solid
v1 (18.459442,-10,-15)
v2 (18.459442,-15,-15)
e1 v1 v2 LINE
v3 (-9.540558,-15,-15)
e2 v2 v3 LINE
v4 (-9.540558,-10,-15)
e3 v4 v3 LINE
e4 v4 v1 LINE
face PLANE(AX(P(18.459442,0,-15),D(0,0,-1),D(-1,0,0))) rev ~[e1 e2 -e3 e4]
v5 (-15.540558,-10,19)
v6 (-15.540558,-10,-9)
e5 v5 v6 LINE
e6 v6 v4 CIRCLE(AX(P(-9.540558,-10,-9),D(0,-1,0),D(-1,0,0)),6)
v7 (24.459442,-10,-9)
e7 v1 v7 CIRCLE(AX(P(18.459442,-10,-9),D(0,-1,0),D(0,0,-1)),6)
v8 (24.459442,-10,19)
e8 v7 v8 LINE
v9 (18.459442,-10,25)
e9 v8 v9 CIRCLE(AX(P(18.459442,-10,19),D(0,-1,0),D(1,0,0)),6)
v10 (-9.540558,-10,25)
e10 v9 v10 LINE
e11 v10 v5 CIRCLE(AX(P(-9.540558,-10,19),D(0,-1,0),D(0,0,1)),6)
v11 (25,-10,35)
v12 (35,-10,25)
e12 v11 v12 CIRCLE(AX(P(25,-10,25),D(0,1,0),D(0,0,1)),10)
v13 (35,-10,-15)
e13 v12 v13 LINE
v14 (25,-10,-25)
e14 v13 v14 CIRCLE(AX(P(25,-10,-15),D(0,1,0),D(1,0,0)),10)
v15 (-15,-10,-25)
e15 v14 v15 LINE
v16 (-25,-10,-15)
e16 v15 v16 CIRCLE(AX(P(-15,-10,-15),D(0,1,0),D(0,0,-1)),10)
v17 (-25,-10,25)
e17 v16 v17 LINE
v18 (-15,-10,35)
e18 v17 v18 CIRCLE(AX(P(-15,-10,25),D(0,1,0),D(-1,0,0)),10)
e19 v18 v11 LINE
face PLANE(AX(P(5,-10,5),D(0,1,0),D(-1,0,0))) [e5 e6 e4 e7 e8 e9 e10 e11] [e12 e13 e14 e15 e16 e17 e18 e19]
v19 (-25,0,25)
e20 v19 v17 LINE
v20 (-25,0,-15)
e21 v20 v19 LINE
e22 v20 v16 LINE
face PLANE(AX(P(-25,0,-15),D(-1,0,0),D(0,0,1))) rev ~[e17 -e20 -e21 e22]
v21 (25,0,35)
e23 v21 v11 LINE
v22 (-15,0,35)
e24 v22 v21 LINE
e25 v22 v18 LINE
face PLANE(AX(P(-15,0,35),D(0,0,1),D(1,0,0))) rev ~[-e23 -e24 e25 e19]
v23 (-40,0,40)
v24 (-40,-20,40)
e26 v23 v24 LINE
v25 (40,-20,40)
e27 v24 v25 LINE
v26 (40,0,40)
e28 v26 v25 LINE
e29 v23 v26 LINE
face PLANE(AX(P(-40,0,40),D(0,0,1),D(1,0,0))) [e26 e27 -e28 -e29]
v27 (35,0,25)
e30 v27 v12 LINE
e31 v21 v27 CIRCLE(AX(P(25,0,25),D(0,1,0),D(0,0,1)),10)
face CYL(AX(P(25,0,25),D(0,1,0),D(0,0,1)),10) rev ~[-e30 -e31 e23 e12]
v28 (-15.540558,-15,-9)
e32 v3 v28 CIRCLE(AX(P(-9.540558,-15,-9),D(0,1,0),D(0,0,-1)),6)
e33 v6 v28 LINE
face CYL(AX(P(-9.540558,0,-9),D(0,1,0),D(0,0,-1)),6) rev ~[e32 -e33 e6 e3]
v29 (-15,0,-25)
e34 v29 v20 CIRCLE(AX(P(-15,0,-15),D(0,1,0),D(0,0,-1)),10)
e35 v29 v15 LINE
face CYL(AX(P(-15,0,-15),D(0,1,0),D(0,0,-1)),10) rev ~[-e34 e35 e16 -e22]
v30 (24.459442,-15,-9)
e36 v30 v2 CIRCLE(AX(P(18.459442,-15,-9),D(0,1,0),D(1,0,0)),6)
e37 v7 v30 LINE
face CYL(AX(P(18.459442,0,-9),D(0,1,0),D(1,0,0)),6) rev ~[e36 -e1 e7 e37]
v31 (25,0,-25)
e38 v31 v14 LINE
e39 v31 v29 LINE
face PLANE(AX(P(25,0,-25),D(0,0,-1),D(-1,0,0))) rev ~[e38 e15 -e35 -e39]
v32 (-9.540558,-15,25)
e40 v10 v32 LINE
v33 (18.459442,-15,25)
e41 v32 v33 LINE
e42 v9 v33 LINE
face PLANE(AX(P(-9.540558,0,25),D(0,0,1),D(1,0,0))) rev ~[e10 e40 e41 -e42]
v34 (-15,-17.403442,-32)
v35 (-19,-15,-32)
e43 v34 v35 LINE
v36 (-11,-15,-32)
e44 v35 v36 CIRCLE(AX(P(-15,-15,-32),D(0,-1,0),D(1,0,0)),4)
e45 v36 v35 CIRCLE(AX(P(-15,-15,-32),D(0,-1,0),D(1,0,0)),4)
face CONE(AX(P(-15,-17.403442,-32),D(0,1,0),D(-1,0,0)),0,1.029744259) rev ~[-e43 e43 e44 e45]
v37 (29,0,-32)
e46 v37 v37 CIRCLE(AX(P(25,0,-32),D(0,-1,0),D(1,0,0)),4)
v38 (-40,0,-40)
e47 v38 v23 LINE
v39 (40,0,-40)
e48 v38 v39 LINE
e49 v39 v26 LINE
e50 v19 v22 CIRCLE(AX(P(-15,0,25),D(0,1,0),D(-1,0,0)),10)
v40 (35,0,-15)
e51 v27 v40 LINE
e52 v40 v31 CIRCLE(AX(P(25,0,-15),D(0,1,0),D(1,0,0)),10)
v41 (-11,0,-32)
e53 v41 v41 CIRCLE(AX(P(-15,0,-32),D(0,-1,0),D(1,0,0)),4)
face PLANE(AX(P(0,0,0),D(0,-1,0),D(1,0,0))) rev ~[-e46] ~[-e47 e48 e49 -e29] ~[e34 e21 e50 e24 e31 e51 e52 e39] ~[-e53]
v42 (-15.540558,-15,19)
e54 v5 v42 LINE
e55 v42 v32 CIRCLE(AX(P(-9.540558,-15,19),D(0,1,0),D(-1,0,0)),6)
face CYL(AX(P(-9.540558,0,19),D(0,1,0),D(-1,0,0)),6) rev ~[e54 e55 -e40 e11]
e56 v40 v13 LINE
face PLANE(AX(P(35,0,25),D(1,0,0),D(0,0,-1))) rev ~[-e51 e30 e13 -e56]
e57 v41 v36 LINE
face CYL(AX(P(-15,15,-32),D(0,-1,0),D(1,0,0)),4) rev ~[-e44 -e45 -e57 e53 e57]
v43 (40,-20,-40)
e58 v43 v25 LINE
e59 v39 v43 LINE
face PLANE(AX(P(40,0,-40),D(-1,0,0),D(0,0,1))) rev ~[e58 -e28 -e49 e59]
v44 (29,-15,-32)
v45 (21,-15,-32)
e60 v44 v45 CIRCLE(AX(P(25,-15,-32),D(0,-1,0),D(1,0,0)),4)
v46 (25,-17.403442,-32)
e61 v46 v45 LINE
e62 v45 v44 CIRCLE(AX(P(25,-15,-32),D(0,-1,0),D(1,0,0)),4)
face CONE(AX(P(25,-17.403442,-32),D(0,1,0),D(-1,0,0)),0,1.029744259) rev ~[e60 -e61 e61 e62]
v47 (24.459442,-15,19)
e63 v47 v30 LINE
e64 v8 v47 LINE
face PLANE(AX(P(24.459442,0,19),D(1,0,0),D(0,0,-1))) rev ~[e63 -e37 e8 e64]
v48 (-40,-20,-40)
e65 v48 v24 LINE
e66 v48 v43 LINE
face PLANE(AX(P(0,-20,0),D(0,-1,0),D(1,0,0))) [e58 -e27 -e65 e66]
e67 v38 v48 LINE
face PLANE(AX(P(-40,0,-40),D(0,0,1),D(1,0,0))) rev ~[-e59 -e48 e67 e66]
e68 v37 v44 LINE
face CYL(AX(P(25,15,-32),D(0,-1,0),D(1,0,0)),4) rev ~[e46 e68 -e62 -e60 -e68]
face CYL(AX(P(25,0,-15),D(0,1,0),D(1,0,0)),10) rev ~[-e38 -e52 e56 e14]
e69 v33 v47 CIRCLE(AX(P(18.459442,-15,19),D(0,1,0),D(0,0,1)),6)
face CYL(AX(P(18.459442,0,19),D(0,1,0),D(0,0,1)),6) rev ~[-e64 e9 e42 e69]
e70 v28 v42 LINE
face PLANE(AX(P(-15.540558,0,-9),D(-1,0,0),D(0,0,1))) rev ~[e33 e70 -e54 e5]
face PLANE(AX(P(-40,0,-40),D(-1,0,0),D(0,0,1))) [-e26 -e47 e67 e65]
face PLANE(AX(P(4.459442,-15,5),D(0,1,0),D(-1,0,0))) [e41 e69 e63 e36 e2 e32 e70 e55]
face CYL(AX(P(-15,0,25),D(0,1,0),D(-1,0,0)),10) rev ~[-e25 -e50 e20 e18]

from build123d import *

# Parameters (mm, degrees)
F0_W     = 80
F0_H     = 80
F1_DEPTH = 20
F3_D     = 8
F3_DEPTH = 15
F3_TIP   = 2.4034424761
F4_DEPTH = 10
F5_DEPTH = 15


with BuildPart() as f1:
    # F0 (on Front) → F1 (new body)
    with BuildSketch(Plane.XZ):
        Rectangle(F0_W, F0_H)
    extrude(amount=F1_DEPTH)

    # F3
    with Locations(Plane(origin=(0, 0, 0), x_dir=(-1, 0, 0), z_dir=(0, 1, 0))):
        with Locations((-25, -32), (15, -32)):
            Hole(F3_D / 2, depth=F3_DEPTH)
            with Locations((0, 0, -(F3_DEPTH + F3_TIP / 2))):  # 118° drill point
                Cone(0, F3_D / 2, F3_TIP, mode=Mode.SUBTRACT)

    # F2 (on face) → F4 (cut)
    with BuildSketch(Plane(origin=(0, 0, 0), x_dir=(-1, 0, 0), z_dir=(0, 1, 0))):
        with BuildLine():
            ThreePointArc((-35, -15), (-32.0710678119, -22.0710678119), (-25, -25))
            Line((-25, -25), (15, -25))
            ThreePointArc((15, -25), (22.0710678119, -22.0710678119), (25, -15))
            Line((25, -15), (25, 25))
            ThreePointArc((25, 25), (22.0710678119, 32.0710678119), (15, 35))
            Line((15, 35), (-25, 35))
            ThreePointArc((-25, 35), (-32.0710678119, 32.0710678119), (-35, 25))
            Line((-35, 25), (-35, -15))
        make_face()
        with BuildLine():
            ThreePointArc((-24.4594421512, 19), (-22.7020828383, 23.2426406871), (-18.4594421512, 25))
            Line((-18.4594421512, 25), (9.5405578488, 25))
            ThreePointArc((9.5405578488, 25), (13.7831985359, 23.2426406871), (15.5405578488, 19))
            Line((15.5405578488, 19), (15.5405578488, -9))
            ThreePointArc((15.5405578488, -9), (13.7831985359, -13.2426406871), (9.5405578488, -15))
            Line((9.5405578488, -15), (-18.4594421512, -15))
            ThreePointArc((-18.4594421512, -15), (-22.7020828383, -13.2426406871), (-24.4594421512, -9))
            Line((-24.4594421512, -9), (-24.4594421512, 19))
        make_face(mode=Mode.SUBTRACT)
    extrude(amount=-F4_DEPTH, mode=Mode.SUBTRACT)

    # F2 (on face) → F5 (cut)
    with BuildSketch(Plane(origin=(0, 0, 0), x_dir=(-1, 0, 0), z_dir=(0, 1, 0))):
        with BuildLine():
            Line((9.5405578488, 25), (-18.4594421512, 25))
            ThreePointArc((-18.4594421512, 25), (-22.7020828383, 23.2426406871), (-24.4594421512, 19))
            Line((-24.4594421512, 19), (-24.4594421512, -9))
            ThreePointArc((-24.4594421512, -9), (-22.7020828383, -13.2426406871), (-18.4594421512, -15))
            Line((-18.4594421512, -15), (9.5405578488, -15))
            ThreePointArc((9.5405578488, -15), (13.7831985359, -13.2426406871), (15.5405578488, -9))
            Line((15.5405578488, -9), (15.5405578488, 19))
            ThreePointArc((15.5405578488, 19), (13.7831985359, 23.2426406871), (9.5405578488, 25))
        make_face()
    extrude(amount=-F5_DEPTH, mode=Mode.SUBTRACT)


solid = f1.part
